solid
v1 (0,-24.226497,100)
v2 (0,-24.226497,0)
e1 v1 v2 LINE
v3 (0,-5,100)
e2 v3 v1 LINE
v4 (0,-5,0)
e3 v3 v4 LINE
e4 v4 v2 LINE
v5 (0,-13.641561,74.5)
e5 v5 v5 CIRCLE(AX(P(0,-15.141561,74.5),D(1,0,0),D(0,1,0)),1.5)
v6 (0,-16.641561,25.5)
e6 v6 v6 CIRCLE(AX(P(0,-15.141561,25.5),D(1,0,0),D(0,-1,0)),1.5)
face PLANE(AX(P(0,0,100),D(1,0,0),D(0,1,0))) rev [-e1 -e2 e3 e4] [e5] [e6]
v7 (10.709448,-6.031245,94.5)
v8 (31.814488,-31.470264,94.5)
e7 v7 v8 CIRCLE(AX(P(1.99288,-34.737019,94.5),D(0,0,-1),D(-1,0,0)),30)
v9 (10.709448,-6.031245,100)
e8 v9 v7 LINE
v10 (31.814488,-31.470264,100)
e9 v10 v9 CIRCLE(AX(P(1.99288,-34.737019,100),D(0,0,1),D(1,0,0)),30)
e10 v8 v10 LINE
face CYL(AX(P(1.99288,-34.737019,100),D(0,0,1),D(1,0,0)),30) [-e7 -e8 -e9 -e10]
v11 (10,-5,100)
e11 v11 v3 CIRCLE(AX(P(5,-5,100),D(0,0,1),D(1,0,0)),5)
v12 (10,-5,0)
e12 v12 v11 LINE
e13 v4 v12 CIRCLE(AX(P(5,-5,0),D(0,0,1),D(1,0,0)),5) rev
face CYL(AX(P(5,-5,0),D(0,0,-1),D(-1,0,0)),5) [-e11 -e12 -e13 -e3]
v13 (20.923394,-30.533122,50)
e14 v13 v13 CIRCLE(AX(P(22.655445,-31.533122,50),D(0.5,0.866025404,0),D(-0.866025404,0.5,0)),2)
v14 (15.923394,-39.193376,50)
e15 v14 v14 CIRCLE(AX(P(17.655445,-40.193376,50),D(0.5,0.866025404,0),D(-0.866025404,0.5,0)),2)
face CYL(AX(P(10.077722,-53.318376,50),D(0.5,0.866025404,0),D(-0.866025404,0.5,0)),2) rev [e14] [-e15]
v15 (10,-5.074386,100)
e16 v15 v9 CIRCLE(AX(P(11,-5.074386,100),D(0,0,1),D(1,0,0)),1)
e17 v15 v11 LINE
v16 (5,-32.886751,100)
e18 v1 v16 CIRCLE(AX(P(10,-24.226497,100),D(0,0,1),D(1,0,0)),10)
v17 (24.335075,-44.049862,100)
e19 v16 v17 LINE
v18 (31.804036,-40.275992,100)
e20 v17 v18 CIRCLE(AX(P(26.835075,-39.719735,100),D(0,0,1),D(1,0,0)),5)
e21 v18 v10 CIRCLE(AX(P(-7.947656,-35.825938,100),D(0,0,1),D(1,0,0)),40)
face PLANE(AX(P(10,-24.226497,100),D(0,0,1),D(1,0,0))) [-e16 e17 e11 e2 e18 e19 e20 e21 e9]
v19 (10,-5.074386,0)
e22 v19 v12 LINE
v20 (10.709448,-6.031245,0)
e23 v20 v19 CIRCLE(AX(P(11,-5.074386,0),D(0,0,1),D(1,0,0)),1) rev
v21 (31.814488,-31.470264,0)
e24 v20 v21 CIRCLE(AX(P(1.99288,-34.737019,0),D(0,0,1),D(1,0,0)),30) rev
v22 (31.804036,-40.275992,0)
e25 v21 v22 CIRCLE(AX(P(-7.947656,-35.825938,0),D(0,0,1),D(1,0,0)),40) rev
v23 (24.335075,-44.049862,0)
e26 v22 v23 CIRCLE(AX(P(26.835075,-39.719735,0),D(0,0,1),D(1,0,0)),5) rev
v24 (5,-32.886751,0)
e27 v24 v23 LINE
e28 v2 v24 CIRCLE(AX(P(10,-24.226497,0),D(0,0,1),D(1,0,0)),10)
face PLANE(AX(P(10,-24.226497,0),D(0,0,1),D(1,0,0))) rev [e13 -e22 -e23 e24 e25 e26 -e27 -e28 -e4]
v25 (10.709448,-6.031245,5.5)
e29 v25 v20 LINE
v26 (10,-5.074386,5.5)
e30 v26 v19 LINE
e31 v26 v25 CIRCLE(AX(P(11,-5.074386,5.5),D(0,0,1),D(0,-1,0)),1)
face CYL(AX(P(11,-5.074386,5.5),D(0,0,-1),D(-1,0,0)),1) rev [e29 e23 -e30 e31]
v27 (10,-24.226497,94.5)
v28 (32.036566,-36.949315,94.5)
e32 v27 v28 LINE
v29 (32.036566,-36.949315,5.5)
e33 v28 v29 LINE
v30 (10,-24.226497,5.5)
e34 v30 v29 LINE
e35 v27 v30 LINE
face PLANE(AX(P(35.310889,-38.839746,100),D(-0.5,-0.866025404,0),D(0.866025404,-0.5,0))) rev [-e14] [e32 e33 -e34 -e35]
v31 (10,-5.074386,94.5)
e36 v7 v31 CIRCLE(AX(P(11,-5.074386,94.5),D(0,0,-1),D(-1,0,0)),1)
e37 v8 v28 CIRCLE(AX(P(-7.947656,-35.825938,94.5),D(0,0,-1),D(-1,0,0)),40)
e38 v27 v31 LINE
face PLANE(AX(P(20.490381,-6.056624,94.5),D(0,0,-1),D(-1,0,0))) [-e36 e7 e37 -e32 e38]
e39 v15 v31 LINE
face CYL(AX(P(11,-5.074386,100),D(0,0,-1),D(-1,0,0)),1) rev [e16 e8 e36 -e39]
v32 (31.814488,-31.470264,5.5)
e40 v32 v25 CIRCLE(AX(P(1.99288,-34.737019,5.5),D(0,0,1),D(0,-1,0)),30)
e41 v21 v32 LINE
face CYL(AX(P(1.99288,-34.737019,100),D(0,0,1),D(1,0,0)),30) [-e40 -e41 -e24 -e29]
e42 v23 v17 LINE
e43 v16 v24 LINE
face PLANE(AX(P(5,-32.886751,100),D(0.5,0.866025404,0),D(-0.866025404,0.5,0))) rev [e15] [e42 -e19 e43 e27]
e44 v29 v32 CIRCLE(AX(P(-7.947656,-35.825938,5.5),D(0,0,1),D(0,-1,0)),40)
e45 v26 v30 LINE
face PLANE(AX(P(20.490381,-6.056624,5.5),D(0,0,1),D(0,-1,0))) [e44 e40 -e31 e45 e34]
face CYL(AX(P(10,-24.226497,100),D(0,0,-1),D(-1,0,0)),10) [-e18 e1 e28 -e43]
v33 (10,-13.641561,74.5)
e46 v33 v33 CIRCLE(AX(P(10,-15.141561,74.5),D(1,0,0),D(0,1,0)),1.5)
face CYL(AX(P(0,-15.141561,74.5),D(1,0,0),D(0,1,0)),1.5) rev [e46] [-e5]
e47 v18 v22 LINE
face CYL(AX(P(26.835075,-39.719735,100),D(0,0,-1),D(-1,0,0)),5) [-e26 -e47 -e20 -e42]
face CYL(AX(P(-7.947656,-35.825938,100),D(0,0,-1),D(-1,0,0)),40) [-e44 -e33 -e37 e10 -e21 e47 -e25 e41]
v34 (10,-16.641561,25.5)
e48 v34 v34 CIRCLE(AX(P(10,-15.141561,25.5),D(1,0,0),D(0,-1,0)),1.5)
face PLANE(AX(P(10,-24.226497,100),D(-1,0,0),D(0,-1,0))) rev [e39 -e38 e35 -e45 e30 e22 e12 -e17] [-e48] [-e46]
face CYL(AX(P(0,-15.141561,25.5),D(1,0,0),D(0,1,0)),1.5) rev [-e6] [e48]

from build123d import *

# Parameters (mm, degrees)
BOSS_EXTRU_1_DEPTH      = 100
ESQUISSE3_R             = 2
ENL_V_MAT_EXTRU_2_DEPTH = 115.052675119
ESQUISSE7_W             = 5.5
ESQUISSE7_H             = 20.980762114
BOSS_EXTRU_3_DEPTH      = 29.226497
BOSS_EXTRU_4_OUTLINE_W  = 5.5
BOSS_EXTRU_4_OUTLINE_H  = 18.169872981
BOSS_EXTRU_4_DEPTH      = 10.490381057
CONG_2_R                = 40
CONG_3_R                = 40
CONG_4_R                = 5
CONG_5_RADIUS           = 5
CONG_5_LENGTH           = 100
ESQUISSE9_R             = 1.5
ENL_V_MAT_EXTRU_3_DEPTH = 112.741489915
CONG_6_R                = 1
CONG_7_R                = 1
CONG_8_R                = 30


# Read off the part's stored shape, not the designer's step: Boss.-Extru.4
with BuildPart() as part:
    # Esquisse1 → Boss.-Extru.1 (new body)
    with BuildSketch(Plane.XY):
        with BuildLine():
            Line((0, 0), (0, -24.226497308))
            ThreePointArc((0, -24.226497308), (1.339745962, -29.226497308), (5, -32.886751346))
            Line((5, -32.886751346), (30.310889132, -47.5))
            Line((30.310889132, -47.5), (35.310889132, -38.839745962))
            Line((35.310889132, -38.839745962), (10, -24.226497308))
            Line((10, -24.226497308), (10, 0))
            Line((10, 0), (0, 0))
        make_face()
    extrude(amount=BOSS_EXTRU_1_DEPTH)

    # Esquisse3 → Enlèv. mat.-Extru.2 (cut, through all)
    with BuildSketch(Plane(origin=(-7.990381057, -13.839745962, 0), x_dir=(0.86602540378444, -0.4999999999999978, 0), z_dir=(0.4999999999999978, 0.86602540378444, 0))):
        with Locations(Location((35.386751346, -50, 0), (0, 0, 180))):
            Circle(ESQUISSE3_R)
    extrude(amount=-ENL_V_MAT_EXTRU_2_DEPTH, mode=Mode.SUBTRACT)

    # Esquisse7 → Boss.-Extru.3 (add)
    with BuildSketch(Plane(origin=(43.301270189, -25, 0), x_dir=(0, 0, -1), z_dir=(0.86602540378444, -0.49999999999999756, 0))):
        with Locations((-97.25, -5.490381057)):
            Rectangle(ESQUISSE7_W, ESQUISSE7_H)
        with Locations((-2.75, -5.490381057)):
            Rectangle(ESQUISSE7_W, ESQUISSE7_H)
    extrude(amount=-BOSS_EXTRU_3_DEPTH)

    # Boss.-Extru.4 outline → Boss.-Extru.4 (add)
    with BuildSketch(Plane(origin=(10, 0, 0), x_dir=(0, 0, -1), z_dir=(1, 0, 0))):
        with Locations((-2.75, -15.141560818)):
            Rectangle(BOSS_EXTRU_4_OUTLINE_W, BOSS_EXTRU_4_OUTLINE_H)
        with Locations((-97.25, -15.141560818)):
            Rectangle(BOSS_EXTRU_4_OUTLINE_W, BOSS_EXTRU_4_OUTLINE_H)
    extrude(amount=BOSS_EXTRU_4_DEPTH)

    # Congé2
    # the kernel refuses this fillet: 40 mm, written as the material it takes off along each edge
    with BuildSketch(Plane(origin=(20.490381057, -6.056624327, 32.29491991), x_dir=(-1, 0, 0), z_dir=(0, 0, -1))) as cong_2_piece_1_section:
        with BuildLine():
            CenterArc((CONG_2_R * 0.267949192431, -CONG_2_R), CONG_2_R, 90, 30)
            Line((-CONG_2_R * 0.232050807569, -CONG_2_R * 0.133974596216), (0, 0))
            Line((0, 0), (CONG_2_R * 0.267949192431, 0))
        make_face()
    cong_2_piece_1 = extrude(amount=59.089839821, mode=Mode.PRIVATE)
    cong_2_piece_1 = split(cong_2_piece_1, bisect_by=Plane(origin=(10, -7.066001807, 2.75), z_dir=(1, 0, 0)), keep=Keep.TOP, mode=Mode.PRIVATE)
    add(cong_2_piece_1, mode=Mode.SUBTRACT)
    with BuildSketch(Plane(origin=(20.490381057, -6.056624327, 67.70508009), x_dir=(-1, 0, 0), z_dir=(0, 0, 1))) as cong_2_piece_2_section:
        with BuildLine():
            CenterArc((CONG_2_R * 0.267949192431, CONG_2_R), CONG_2_R, 240, 30)
            Line((-CONG_2_R * 0.232050807569, CONG_2_R * 0.133974596216), (0, 0))
            Line((0, 0), (CONG_2_R * 0.267949192431, 0))
        make_face()
    cong_2_piece_2 = extrude(amount=59.089839821, mode=Mode.PRIVATE)
    cong_2_piece_2 = split(cong_2_piece_2, bisect_by=Plane(origin=(10, -7.066001807, 97.25), z_dir=(1, 0, 0)), keep=Keep.TOP, mode=Mode.PRIVATE)
    add(cong_2_piece_2, mode=Mode.SUBTRACT)

    # Congé3
    # the kernel refuses this fillet: 40 mm, written as the material it takes off along each edge
    with BuildSketch(Plane(origin=(45.801270189, -20.669872981, -2.92475776), x_dir=(-0.8660254037844402, 0.49999999999999756, 0), z_dir=(0, 0, 1))) as cong_3_piece_1:
        with BuildLine():
            CenterArc((38.969903104, 40), CONG_3_R, 193.031161189, 76.968838811)
            Line((0, 30.980762114), (-0.779398062, 30.800377356))
            ThreePointArc((-0.779398062, 30.800377356), (-0.8, 15.490381057), (-0.8, 0))
            Line((-0.8, 0), (0, -0.8))
            Line((0, -0.8), (38.969903104, -0.8))
            Line((38.969903104, -0.8), (38.969903104, 0))
        make_face()
    extrude(amount=200.349515521, mode=Mode.SUBTRACT)

    # Congé4
    cong_4_edges = [part.edges().sort_by_distance(p)[0] for p in [
        (30.310889132, -47.5, 50),
    ]]
    fillet(cong_4_edges, radius=CONG_4_R)

    # Congé5: full round fillet: the end face becomes a half cylinder, R = half its width
    cong_5_face = Plane((5, 0, 50), x_dir=(0, 0, -1), z_dir=(0, 1, 0))  # on the end face: x along it, z out of the body
    cong_5_slab = cong_5_face.offset(-CONG_5_RADIUS / 2) * Box(CONG_5_LENGTH, 2 * CONG_5_RADIUS, CONG_5_RADIUS, mode=Mode.PRIVATE)  # the body's end, R deep
    cong_5_round = Plane((5, -5, 50), x_dir=(0, 1, 0), z_dir=(0, 0, -1)) * Cylinder(CONG_5_RADIUS, CONG_5_LENGTH, mode=Mode.PRIVATE)  # its axis R under the face
    add(cong_5_slab - cong_5_round, mode=Mode.SUBTRACT)

    # Esquisse9 → Enlèv. mat.-Extru.3 (cut, through all)
    with BuildSketch(Plane(origin=(10, 0, 0), x_dir=(0, 0, -1), z_dir=(1, 0, 0))):
        with Locations(Location((-74.5, -15.141560818, 0), (0, 0, 90))):
            Circle(ESQUISSE9_R)
        with Locations(Location((-25.5, -15.141560818, 0), (0, 0, 270))):
            Circle(ESQUISSE9_R)
    extrude(amount=-ENL_V_MAT_EXTRU_3_DEPTH, mode=Mode.SUBTRACT)

    # Congé6
    cong_6_edges = [part.edges().sort_by_distance(p)[0] for p in [
        (10, -6.057271778, 97.25),
    ]]
    fillet(cong_6_edges, radius=CONG_6_R)

    # Congé7
    cong_7_edges = [part.edges().sort_by_distance(p)[0] for p in [
        (10, -6.057271778, 2.75),
    ]]
    fillet(cong_7_edges, radius=CONG_7_R)

    # Congé8
    cong_8_edges = [part.edges().sort_by_distance(p)[0] for p in [
        (20.24714696, -7.452480042, 97.25),
        (20.24714696, -7.452480042, 2.75),
    ]]
    fillet(cong_8_edges, radius=CONG_8_R)


solid = part.part
